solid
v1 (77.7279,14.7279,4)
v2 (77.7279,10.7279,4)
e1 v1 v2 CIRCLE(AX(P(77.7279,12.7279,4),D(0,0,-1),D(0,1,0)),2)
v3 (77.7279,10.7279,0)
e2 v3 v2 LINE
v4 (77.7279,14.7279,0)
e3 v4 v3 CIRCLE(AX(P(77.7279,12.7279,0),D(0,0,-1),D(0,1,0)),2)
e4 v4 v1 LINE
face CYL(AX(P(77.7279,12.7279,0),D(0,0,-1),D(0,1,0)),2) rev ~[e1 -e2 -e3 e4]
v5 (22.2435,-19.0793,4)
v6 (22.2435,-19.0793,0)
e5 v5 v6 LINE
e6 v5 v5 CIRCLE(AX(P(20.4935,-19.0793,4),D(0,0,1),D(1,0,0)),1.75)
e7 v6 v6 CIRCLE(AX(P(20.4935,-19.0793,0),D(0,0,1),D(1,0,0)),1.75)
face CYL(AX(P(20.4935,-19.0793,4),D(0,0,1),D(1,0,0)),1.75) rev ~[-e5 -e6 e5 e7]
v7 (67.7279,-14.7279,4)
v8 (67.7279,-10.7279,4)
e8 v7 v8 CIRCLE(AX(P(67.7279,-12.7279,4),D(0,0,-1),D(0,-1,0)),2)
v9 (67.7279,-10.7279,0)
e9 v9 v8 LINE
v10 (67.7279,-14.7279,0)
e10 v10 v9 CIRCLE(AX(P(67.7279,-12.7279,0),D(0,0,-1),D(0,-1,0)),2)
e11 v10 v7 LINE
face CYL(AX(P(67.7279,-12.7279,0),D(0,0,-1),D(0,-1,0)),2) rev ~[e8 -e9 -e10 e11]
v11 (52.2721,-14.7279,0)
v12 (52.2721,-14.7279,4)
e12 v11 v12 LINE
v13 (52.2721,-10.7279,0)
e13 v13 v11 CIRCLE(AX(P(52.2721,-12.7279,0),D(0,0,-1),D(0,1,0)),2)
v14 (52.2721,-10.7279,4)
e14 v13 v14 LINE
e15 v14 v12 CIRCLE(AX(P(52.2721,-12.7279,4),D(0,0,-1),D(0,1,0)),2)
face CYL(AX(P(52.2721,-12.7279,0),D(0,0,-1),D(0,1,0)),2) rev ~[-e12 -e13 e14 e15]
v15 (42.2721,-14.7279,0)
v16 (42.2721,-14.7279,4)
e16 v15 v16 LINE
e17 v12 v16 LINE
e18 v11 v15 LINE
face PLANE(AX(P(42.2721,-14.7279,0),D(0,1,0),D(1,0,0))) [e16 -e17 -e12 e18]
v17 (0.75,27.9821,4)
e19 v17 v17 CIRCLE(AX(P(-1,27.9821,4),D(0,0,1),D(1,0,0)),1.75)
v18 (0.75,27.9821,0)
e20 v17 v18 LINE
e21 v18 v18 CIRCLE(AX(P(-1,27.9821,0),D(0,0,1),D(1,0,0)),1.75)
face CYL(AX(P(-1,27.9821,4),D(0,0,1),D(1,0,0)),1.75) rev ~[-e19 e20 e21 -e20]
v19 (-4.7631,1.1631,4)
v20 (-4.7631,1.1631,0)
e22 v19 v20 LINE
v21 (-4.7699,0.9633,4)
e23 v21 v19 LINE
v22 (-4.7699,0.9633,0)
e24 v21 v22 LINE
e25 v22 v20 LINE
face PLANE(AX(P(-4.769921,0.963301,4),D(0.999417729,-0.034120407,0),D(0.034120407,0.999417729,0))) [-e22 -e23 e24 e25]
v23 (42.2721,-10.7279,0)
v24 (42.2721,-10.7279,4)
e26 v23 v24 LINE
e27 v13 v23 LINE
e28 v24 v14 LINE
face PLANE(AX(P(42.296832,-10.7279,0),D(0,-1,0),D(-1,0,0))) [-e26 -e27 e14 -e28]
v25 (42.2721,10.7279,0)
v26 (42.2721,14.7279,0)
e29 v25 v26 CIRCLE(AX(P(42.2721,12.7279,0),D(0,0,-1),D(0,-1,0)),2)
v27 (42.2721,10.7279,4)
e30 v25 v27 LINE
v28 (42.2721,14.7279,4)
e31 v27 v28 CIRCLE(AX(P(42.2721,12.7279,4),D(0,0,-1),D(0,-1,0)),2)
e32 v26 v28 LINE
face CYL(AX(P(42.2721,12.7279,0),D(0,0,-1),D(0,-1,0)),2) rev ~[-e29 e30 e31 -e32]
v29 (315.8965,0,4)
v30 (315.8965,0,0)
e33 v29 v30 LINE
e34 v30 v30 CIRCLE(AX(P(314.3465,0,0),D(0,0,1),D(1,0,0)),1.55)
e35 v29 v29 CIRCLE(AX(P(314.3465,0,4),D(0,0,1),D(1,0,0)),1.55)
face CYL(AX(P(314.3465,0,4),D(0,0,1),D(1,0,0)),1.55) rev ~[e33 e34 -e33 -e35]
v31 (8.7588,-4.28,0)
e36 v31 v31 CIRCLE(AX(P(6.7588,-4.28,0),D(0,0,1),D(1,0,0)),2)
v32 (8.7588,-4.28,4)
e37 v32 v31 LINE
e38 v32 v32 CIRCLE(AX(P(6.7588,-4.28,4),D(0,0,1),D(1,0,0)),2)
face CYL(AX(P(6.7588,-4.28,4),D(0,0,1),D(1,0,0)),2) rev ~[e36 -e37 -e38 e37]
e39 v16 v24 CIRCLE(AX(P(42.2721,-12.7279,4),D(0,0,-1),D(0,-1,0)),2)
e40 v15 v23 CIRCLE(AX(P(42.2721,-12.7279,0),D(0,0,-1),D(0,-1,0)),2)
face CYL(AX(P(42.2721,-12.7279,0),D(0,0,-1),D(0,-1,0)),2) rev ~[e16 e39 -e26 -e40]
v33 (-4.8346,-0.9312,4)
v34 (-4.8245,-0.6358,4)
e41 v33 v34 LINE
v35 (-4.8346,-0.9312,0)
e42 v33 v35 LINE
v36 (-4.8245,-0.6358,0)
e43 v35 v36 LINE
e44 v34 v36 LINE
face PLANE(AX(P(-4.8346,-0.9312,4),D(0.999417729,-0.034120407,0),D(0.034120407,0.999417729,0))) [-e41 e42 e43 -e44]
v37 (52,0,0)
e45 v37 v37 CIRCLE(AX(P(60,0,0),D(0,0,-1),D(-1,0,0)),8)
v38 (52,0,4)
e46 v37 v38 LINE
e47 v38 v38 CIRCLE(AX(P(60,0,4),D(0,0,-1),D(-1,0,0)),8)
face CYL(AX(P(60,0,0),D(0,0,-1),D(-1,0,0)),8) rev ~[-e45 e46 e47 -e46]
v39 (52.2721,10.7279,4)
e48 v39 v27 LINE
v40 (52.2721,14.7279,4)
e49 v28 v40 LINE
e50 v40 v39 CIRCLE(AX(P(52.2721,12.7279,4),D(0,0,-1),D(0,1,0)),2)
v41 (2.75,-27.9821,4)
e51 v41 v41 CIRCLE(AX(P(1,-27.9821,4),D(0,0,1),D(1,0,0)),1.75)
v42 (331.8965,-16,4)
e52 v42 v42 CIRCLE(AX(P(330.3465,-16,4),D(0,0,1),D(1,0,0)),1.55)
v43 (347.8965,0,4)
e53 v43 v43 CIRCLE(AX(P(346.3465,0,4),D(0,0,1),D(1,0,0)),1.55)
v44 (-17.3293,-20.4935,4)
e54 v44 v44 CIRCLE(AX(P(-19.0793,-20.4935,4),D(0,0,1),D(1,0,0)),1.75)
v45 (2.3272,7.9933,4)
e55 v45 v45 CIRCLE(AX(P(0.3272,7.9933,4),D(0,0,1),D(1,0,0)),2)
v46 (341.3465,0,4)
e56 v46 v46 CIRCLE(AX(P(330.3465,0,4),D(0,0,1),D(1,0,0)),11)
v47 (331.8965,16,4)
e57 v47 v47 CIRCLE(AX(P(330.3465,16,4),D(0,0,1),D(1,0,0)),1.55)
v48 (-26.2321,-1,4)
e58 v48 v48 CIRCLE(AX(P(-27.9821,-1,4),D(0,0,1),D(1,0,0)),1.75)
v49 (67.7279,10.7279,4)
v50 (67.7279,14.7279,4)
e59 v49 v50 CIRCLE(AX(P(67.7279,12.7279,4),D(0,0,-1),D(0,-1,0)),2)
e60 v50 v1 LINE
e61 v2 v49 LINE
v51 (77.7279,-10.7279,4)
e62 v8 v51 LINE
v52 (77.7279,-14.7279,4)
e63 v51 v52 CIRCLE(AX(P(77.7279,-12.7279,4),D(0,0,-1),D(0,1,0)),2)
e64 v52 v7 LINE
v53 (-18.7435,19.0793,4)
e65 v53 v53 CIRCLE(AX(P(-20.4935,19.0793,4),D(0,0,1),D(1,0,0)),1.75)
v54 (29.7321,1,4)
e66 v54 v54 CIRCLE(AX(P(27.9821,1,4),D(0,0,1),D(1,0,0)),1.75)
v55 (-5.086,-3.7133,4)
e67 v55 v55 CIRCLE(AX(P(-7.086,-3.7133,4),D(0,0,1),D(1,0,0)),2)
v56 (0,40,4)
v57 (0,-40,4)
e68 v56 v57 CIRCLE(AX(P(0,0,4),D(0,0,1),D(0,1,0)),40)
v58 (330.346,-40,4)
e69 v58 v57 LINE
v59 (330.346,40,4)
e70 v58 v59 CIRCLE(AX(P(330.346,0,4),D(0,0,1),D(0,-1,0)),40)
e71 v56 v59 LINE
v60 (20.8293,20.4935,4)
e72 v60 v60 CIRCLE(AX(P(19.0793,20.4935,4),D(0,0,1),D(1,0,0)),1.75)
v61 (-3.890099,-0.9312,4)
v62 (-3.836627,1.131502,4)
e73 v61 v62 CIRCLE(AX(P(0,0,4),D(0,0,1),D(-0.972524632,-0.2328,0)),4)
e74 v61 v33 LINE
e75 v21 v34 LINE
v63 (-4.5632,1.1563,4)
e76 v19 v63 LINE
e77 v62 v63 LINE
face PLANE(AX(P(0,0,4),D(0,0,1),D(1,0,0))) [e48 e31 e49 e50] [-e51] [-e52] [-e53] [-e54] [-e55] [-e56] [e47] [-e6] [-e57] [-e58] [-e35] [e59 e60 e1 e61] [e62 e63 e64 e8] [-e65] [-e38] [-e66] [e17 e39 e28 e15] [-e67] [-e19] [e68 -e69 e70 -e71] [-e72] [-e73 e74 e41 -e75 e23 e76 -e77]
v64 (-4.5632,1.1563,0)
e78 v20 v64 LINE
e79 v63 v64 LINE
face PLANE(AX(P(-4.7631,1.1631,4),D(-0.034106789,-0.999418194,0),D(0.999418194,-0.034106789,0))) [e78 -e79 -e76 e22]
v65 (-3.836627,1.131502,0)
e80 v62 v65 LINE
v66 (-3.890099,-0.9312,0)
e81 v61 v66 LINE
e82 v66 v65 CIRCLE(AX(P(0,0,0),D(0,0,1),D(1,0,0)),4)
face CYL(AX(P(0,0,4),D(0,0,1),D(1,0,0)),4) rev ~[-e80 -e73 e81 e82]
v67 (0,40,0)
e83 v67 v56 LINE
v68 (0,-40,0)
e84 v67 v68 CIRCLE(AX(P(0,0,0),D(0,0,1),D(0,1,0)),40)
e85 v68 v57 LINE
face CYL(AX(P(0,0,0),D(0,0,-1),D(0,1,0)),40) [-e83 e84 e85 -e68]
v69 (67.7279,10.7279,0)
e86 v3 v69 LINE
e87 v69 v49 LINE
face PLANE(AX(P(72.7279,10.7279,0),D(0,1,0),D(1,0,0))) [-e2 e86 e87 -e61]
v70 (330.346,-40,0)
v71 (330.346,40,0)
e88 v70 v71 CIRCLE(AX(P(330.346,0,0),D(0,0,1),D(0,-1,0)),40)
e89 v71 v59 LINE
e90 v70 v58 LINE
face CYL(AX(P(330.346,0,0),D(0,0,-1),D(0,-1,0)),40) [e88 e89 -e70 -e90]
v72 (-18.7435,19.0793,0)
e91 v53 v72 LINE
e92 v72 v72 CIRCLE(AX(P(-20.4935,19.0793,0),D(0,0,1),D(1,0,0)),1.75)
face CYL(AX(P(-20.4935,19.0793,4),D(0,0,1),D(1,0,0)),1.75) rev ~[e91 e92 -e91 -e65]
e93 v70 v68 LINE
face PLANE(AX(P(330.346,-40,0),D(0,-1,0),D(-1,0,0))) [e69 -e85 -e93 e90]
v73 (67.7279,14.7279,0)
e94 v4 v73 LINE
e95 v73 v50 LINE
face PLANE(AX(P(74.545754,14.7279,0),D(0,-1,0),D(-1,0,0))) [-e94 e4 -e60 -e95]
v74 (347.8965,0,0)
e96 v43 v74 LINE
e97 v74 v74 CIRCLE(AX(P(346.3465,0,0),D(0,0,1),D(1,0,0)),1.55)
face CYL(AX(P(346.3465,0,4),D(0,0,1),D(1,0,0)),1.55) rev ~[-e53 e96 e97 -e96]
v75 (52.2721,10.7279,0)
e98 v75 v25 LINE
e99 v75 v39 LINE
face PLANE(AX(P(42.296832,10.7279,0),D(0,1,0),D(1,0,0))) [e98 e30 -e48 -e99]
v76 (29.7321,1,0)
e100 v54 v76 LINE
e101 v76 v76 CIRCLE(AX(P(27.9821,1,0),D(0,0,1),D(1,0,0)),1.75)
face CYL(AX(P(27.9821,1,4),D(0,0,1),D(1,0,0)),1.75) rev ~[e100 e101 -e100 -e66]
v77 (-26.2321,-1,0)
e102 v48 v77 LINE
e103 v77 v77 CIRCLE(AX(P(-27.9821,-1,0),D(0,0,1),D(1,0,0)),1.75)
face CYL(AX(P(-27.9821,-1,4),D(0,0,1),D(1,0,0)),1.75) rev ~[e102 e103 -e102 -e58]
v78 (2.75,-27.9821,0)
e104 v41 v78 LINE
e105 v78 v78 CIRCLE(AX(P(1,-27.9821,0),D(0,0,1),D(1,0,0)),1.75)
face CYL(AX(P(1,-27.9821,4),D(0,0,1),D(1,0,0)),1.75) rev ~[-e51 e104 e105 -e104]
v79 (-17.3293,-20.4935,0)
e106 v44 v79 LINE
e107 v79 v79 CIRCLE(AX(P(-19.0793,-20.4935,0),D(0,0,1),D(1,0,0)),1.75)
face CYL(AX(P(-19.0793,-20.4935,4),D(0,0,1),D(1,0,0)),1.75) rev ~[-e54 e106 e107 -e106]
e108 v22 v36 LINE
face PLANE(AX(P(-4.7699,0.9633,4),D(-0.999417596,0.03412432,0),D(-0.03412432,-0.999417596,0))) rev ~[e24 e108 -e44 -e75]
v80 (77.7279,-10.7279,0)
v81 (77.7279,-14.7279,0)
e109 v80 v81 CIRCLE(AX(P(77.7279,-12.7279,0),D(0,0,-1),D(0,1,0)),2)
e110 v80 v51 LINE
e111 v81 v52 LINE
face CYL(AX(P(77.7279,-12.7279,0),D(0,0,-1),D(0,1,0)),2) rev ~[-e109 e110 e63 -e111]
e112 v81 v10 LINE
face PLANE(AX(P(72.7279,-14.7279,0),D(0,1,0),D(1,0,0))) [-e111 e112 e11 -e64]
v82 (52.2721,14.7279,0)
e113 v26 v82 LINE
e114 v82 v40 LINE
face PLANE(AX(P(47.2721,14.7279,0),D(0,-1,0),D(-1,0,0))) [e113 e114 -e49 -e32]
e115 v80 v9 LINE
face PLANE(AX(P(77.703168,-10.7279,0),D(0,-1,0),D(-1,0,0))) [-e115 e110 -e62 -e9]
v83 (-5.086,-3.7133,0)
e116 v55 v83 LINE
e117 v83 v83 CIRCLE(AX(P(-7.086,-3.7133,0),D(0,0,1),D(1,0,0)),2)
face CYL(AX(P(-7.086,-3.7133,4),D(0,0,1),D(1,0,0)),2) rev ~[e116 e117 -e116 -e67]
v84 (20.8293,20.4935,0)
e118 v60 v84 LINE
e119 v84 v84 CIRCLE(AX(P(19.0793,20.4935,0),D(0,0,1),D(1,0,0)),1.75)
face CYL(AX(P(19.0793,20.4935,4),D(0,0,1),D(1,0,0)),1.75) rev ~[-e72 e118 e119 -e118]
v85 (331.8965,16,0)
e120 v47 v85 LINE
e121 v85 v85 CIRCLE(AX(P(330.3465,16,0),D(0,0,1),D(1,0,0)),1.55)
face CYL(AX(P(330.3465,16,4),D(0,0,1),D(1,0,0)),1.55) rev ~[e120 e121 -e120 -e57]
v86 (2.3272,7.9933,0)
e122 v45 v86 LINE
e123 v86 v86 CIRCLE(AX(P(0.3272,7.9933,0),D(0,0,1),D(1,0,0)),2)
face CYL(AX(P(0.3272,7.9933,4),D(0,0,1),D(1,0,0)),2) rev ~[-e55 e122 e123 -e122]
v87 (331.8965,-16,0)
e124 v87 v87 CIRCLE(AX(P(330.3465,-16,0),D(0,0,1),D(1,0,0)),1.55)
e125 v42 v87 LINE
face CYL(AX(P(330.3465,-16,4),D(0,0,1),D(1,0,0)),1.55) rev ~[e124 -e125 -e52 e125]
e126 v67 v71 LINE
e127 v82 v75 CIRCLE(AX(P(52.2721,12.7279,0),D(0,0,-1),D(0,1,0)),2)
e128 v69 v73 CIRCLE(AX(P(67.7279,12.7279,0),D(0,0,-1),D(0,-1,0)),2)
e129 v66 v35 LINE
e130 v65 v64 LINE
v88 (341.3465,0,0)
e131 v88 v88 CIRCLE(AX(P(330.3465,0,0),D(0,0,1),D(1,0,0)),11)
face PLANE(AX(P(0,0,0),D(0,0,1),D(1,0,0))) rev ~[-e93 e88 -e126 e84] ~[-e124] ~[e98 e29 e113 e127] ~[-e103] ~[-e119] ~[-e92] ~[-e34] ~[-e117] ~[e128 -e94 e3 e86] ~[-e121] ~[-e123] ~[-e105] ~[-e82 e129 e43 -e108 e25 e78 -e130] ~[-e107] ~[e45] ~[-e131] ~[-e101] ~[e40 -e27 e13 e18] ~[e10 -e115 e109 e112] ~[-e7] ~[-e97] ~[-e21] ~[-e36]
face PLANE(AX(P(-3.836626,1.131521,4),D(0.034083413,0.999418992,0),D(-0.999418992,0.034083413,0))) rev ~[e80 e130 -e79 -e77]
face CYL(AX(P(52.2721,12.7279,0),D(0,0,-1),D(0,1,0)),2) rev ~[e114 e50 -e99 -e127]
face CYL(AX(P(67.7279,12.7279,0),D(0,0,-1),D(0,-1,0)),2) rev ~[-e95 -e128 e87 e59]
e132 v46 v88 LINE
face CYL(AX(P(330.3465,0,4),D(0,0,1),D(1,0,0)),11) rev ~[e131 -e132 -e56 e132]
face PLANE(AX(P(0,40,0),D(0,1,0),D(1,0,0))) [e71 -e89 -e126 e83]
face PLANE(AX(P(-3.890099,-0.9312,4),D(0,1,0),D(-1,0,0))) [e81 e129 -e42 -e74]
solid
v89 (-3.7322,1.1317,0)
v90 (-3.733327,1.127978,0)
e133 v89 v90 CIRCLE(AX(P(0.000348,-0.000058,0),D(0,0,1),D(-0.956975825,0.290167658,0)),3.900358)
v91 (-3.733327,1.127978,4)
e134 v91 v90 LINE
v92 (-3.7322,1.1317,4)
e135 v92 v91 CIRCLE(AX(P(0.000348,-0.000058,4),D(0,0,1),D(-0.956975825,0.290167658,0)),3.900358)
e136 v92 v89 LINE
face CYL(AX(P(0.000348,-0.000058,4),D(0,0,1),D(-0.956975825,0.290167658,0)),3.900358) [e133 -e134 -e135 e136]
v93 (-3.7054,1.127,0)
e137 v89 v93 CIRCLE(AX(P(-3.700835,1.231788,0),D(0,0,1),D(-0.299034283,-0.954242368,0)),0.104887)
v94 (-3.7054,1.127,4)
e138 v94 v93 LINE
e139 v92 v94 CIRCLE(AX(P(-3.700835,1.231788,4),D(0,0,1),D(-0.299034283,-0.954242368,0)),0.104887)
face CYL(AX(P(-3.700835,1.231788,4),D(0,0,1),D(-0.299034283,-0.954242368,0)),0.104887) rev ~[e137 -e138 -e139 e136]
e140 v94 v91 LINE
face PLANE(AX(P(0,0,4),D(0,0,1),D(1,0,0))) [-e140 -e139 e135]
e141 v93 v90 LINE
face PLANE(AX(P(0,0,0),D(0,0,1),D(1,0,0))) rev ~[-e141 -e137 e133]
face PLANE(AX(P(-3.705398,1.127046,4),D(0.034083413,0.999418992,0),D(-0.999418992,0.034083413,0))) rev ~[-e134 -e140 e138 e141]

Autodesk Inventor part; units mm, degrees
ref_plane "YZ Plane" through (0, 0, 0) normal (1, 0, 0) x (0, 1, 0)
ref_plane "XZ Plane" through (0, 0, 0) normal (0, 1, 0) x (-1, 0, 0)
ref_plane "XY Plane" through (0, 0, 0) normal (0, 0, 1) x (1, 0, 0)
sketch "Sketch1" plane through (0, 0, 0) normal (0, 0, 1) x (1, 0, 0)
  arc A0 (0, 40) -> (0, -40) centre (0, 0) ccw
  arc A1 (330.346, -40) -> (330.346, 40) centre (330.346, 0) ccw
  line L0 (0, 40) -> (330.346, 40)
  line L1 (330.346, -40) -> (0, -40)
  dimension "d0" = 80
  dimension "d1" = 330.346
extrude "Extrusion1" add sketch "Sketch1" along normal blind 4
sketch "Sketch2" plane through (0, 0, 4) normal (0, 0, 1) x (1, 0, 0)
  circle A0 centre (0, 0) radius 3.5
  circle A1 centre (0, 0) radius 4
  arc A2 (-3.7322, 1.1317) -> (-3.8007, -0.8746) centre (0, 0) ccw
  arc A3 (-3.7322, 1.1317) -> (-3.7054, 1.127) centre (-3.702, 1.227) ccw
  line L0 (-3.7054, 1.127) -> (-1.9647, 1.0676)
  line L1 (-1.9647, 1.0676) -> (-2.0329, -0.9312)
  line L2 (-3.7736, -0.8718) -> (-2.0329, -0.9312)
  arc A4 (-3.7736, -0.8718) -> (-3.8007, -0.8746) centre (-3.777, -0.9717) ccw
  line L3 (-4.7699, 0.9633) -> (-4.8245, -0.6358)
  line L4 (-4.6314, -0.8425) -> (-2.2328, -0.9244)
  line L5 (-3.7054, 1.127) -> (-1.9647, 1.0676)
  line L6 (-2.1646, 1.0745) -> (-4.5632, 1.1563)
  line L7 (-2.0329, -0.9312) -> (-4.8346, -0.9312)
  line L8 (-4.8346, -0.9312) -> (-4.7631, 1.1631)
  line L9 (-4.7631, 1.1631) -> (-1.9647, 1.0676)
  line L10 (-1.9647, 1.0676) -> (-2.0329, -0.9312)
  point P0 (0, 0)
  point P1 (-3.9048, -0.8673)
  point P2 (-3.8366, 1.1315)
  point P3 (4.6, 1)
  point P4 (-3.8366, 1.1315)
  point P5 (2.2, 1)
  point P6 (-3.8901, -0.9312)
  point P7 (-3.7333, 1.128)
extrude "Extrusion2" cut sketch "Sketch2" against normal through all contours A0 L7 L1 L0 | A0 L0 A3 A2 L6 A1 L7 | L0 L1 L2 A0 | A0 L2 L4 A2 L6 L0 | L7 A1 L4 A2 A4 L2 A0 | A0 L2 L7 | L7 L8 L3 L9 L6 A1 | A4 A2 L4 | A2 L4 A1 L6
sketch "Sketch3" plane through (0, 0, 4) normal (0, 0, 1) x (1, 0, 0)
  circle A0 centre (-20.4935, 19.0793) radius 1.75 projected
  circle A1 centre (0, 0) radius 32.3 projected
  circle A2 centre (-27.9821, -1) radius 1.75 projected
  circle A3 centre (19.0793, 20.4935) radius 1.75 projected
  circle A4 centre (0, 0) radius 22.6623 projected
  circle A5 centre (20.4935, -19.0793) radius 1.75 projected
  circle A6 centre (-19.0793, -20.4935) radius 1.75 projected
  circle A7 centre (-1, 27.9821) radius 1.75 projected
  circle A8 centre (1, -27.9821) radius 1.75 projected
  circle A9 centre (27.9821, 1) radius 1.75 projected
  point P0 (0, 0)
extrude "Extrusion3" cut sketch "Sketch3" against normal through all contours A0 | A2 | A3 | A5 | A6 | A7 | A8 | A9
sketch "Sketch4" plane through (0, 0, 4) normal (0, 0, 1) x (1, 0, 0)
  circle A0 centre (0, 0) radius 12 projected
  circle A1 centre (-7.086, -3.7133) radius 2 projected
  circle A2 centre (6.7588, -4.28) radius 2 projected
  circle A3 centre (0.3272, 7.9933) radius 2 projected
  line L0 (-4.7551, 1.1955) -> (-4.8369, -0.8028) projected
  line L1 (-3.8288, 1.1576) -> (-4.7551, 1.1955) projected
  arc A4 (-3.9106, -0.8407) -> (-3.8288, 1.1576) centre (0, 0) ccw projected
  line L2 (-4.8369, -0.8028) -> (-3.9106, -0.8407) projected
  point P0 (0, 0)
extrude "Extrusion4" cut sketch "Sketch4" against normal through all contours A1 | A2 | A3
sketch "Sketch5" plane through (0, 0, 0) normal (0, 0, -1) x (-1, 0, 0)
  circle A0 centre (-60, 0) radius 12.5 projected
  circle A1 centre (-47.2721, 12.7279) radius 2 projected
  circle A2 centre (-72.7279, -12.7279) radius 2 projected
  circle A3 centre (-47.2721, -12.7279) radius 2 projected
  circle A4 centre (-72.7279, 12.7279) radius 2 projected
  circle A5 centre (-76, 0) radius 1.6 projected
  circle A6 centre (-44, 0) radius 1.6 projected
  circle A7 centre (-60, -16) radius 1.6 projected
  circle A8 centre (-60, 16) radius 1.6 projected
  circle A9 centre (-60, 0) radius 20.7 projected
  line L0 (-67.7279, 12.7279) -> (-77.7279, 12.7279) construction
  line L1 (-67.7279, 10.7279) -> (-77.7279, 10.7279)
  line L2 (-77.7279, 14.7279) -> (-67.7279, 14.7279)
  arc A10 (-67.7279, 10.7279) -> (-67.7279, 14.7279) centre (-67.7279, 12.7279) ccw
  arc A11 (-77.7279, 14.7279) -> (-77.7279, 10.7279) centre (-77.7279, 12.7279) ccw
  line L3 (-67.7279, -12.7279) -> (-77.7279, -12.7279) construction
  line L4 (-67.7279, -14.7279) -> (-77.7279, -14.7279)
  line L5 (-77.7279, -10.7279) -> (-67.7279, -10.7279)
  arc A12 (-67.7279, -14.7279) -> (-67.7279, -10.7279) centre (-67.7279, -12.7279) ccw
  arc A13 (-77.7279, -10.7279) -> (-77.7279, -14.7279) centre (-77.7279, -12.7279) ccw
  line L6 (-42.2721, 12.7279) -> (-52.2721, 12.7279) construction
  line L7 (-42.2721, 10.7279) -> (-52.2721, 10.7279)
  line L8 (-52.2721, 14.7279) -> (-42.2721, 14.7279)
  arc A14 (-42.2721, 10.7279) -> (-42.2721, 14.7279) centre (-42.2721, 12.7279) ccw
  arc A15 (-52.2721, 14.7279) -> (-52.2721, 10.7279) centre (-52.2721, 12.7279) ccw
  line L9 (-52.2721, -12.7279) -> (-42.2721, -12.7279) construction
  line L10 (-52.2721, -10.7279) -> (-42.2721, -10.7279)
  line L11 (-42.2721, -14.7279) -> (-52.2721, -14.7279)
  arc A16 (-52.2721, -10.7279) -> (-52.2721, -14.7279) centre (-52.2721, -12.7279) ccw
  arc A17 (-42.2721, -14.7279) -> (-42.2721, -10.7279) centre (-42.2721, -12.7279) ccw
  circle A18 centre (-60, 0) radius 4 projected
  circle A19 centre (-60, 0) radius 8 projected
  point P0 (0, 0)
  dimension "d11" = 10
  dimension "d13" = 10
  dimension "d15" = 10
  dimension "d16" = 10
extrude "Extrusion5" cut sketch "Sketch5" against normal through all contours A1 | A1 L8 A9 L7 | A1 L7 A15 L8 | L8 A14 L7 A9 | L2 A4 L1 A9 | A9 L1 A11 L2 | L2 A10 L1 A4 | A4 | L10 A17 L11 A9 | A9 L11 A3 L10 | L5 A2 L4 A9 | A9 L4 A13 L5 | A3 | A3 L11 A16 L10 | L5 A12 L4 A2 | A2 | A18 | A19
sketch "Sketch9" plane through (0, 0, 4) normal (0, 0, 1) x (1, 0, 0)
  arc A0 (329.9154, -13.284) -> (330.7776, -13.284) centre (330.3465, -16) ccw projected
  arc A1 (317.0625, -0.4311) -> (329.9154, -13.284) centre (330.3465, 0) ccw projected
  arc A2 (317.0625, 0.4311) -> (317.0625, -0.4311) centre (314.3465, 0) ccw projected
  arc A3 (329.9154, 13.284) -> (317.0625, 0.4311) centre (330.3465, 0) ccw projected
  arc A4 (330.7776, 13.284) -> (329.9154, 13.284) centre (330.3465, 16) ccw projected
  arc A5 (343.6305, 0.4311) -> (330.7776, 13.284) centre (330.3465, 0) ccw projected
  arc A6 (343.6305, -0.4311) -> (343.6305, 0.4311) centre (346.3465, 0) ccw projected
  arc A7 (330.7776, -13.284) -> (343.6305, -0.4311) centre (330.3465, 0) ccw projected
  circle A8 centre (330.3465, 0) radius 20.2623 projected
  circle A9 centre (330.3465, -16) radius 1.55 projected
  circle A10 centre (314.3465, 0) radius 1.55 projected
  circle A11 centre (330.3465, 16) radius 1.55 projected
  circle A12 centre (346.3465, 0) radius 1.55 projected
  circle A13 centre (330.3465, 0) radius 11
  point P0 (0, 0)
  dimension "d26" = 22
extrude "Extrusion8" cut sketch "Sketch9" against normal through all contours A9 | A10 | A11 | A12 | A13
sketch "Sketch11" plane through (0, 0, 4) normal (0, 0, 1) x (1, 0, 0)
  circle A0 centre (330.3465, -16) radius 1.55 projected
  circle A1 centre (314.3465, 0) radius 1.55 projected
  circle A2 centre (346.3465, 0) radius 1.55 projected
  circle A3 centre (330.3465, 16) radius 1.55 projected
  circle A4 centre (330.3465, 0) radius 11 projected
  arc A5 (52.2721, 10.7279) -> (52.2721, 14.7279) centre (52.2721, 12.7279) ccw projected
  line L0 (52.2721, 10.7279) -> (42.2721, 10.7279) projected
  arc A6 (42.2721, 14.7279) -> (42.2721, 10.7279) centre (42.2721, 12.7279) ccw projected
  line L1 (42.2721, 14.7279) -> (52.2721, 14.7279) projected
  arc A7 (77.7279, 10.7279) -> (77.7279, 14.7279) centre (77.7279, 12.7279) ccw projected
  line L2 (77.7279, 10.7279) -> (67.7279, 10.7279) projected
  arc A8 (67.7279, 14.7279) -> (67.7279, 10.7279) centre (67.7279, 12.7279) ccw projected
  line L3 (67.7279, 14.7279) -> (77.7279, 14.7279) projected
  arc A9 (52.2721, -14.7279) -> (52.2721, -10.7279) centre (52.2721, -12.7279) ccw projected
  line L4 (52.2721, -14.7279) -> (42.2721, -14.7279) projected
  arc A10 (42.2721, -10.7279) -> (42.2721, -14.7279) centre (42.2721, -12.7279) ccw projected
  line L5 (42.2721, -10.7279) -> (52.2721, -10.7279) projected
  arc A11 (67.7279, -10.7279) -> (67.7279, -14.7279) centre (67.7279, -12.7279) ccw projected
  line L6 (67.7279, -10.7279) -> (77.7279, -10.7279) projected
  arc A12 (77.7279, -14.7279) -> (77.7279, -10.7279) centre (77.7279, -12.7279) ccw projected
  line L7 (77.7279, -14.7279) -> (67.7279, -14.7279) projected
  circle A13 centre (60, 0) radius 8 projected
  circle A14 centre (6.7588, -4.28) radius 2 projected
  circle A15 centre (-7.086, -3.7133) radius 2 projected
  circle A16 centre (0.3272, 7.9933) radius 2 projected
  circle A17 centre (27.9821, 1) radius 1.75 projected
  circle A18 centre (-27.9821, -1) radius 1.75 projected
  circle A19 centre (-19.0793, -20.4935) radius 1.75 projected
  circle A20 centre (19.0793, 20.4935) radius 1.75 projected
  circle A21 centre (20.4935, -19.0793) radius 1.75 projected
  circle A22 centre (-20.4935, 19.0793) radius 1.75 projected
  circle A23 centre (1, -27.9821) radius 1.75 projected
  circle A24 centre (-1, 27.9821) radius 1.75 projected
  line L8 (0, -40) -> (330.346, -40) projected
  arc A25 (330.346, -40) -> (330.346, 40) centre (330.346, 0) ccw projected
  line L9 (330.346, 40) -> (0, 40) projected
  arc A26 (0, 40) -> (0, -40) centre (0, 0) ccw projected
  line L10 (-4.8346, -0.9312) -> (-4.7631, 1.1631) projected
  line L11 (-4.7631, 1.1631) -> (-3.8366, 1.1315) projected
  arc A27 (-3.8901, -0.9312) -> (-3.8366, 1.1315) centre (0, 0) ccw projected
  line L12 (-3.8901, -0.9312) -> (-4.8346, -0.9312) projected
equation "\"d11\" = d13"
equation "\"d15\" = d14"
equation "\"d16\" = d11"
equation "\"d14\" = d11"
properties part number "arm1" material "Aluminum 6061"
